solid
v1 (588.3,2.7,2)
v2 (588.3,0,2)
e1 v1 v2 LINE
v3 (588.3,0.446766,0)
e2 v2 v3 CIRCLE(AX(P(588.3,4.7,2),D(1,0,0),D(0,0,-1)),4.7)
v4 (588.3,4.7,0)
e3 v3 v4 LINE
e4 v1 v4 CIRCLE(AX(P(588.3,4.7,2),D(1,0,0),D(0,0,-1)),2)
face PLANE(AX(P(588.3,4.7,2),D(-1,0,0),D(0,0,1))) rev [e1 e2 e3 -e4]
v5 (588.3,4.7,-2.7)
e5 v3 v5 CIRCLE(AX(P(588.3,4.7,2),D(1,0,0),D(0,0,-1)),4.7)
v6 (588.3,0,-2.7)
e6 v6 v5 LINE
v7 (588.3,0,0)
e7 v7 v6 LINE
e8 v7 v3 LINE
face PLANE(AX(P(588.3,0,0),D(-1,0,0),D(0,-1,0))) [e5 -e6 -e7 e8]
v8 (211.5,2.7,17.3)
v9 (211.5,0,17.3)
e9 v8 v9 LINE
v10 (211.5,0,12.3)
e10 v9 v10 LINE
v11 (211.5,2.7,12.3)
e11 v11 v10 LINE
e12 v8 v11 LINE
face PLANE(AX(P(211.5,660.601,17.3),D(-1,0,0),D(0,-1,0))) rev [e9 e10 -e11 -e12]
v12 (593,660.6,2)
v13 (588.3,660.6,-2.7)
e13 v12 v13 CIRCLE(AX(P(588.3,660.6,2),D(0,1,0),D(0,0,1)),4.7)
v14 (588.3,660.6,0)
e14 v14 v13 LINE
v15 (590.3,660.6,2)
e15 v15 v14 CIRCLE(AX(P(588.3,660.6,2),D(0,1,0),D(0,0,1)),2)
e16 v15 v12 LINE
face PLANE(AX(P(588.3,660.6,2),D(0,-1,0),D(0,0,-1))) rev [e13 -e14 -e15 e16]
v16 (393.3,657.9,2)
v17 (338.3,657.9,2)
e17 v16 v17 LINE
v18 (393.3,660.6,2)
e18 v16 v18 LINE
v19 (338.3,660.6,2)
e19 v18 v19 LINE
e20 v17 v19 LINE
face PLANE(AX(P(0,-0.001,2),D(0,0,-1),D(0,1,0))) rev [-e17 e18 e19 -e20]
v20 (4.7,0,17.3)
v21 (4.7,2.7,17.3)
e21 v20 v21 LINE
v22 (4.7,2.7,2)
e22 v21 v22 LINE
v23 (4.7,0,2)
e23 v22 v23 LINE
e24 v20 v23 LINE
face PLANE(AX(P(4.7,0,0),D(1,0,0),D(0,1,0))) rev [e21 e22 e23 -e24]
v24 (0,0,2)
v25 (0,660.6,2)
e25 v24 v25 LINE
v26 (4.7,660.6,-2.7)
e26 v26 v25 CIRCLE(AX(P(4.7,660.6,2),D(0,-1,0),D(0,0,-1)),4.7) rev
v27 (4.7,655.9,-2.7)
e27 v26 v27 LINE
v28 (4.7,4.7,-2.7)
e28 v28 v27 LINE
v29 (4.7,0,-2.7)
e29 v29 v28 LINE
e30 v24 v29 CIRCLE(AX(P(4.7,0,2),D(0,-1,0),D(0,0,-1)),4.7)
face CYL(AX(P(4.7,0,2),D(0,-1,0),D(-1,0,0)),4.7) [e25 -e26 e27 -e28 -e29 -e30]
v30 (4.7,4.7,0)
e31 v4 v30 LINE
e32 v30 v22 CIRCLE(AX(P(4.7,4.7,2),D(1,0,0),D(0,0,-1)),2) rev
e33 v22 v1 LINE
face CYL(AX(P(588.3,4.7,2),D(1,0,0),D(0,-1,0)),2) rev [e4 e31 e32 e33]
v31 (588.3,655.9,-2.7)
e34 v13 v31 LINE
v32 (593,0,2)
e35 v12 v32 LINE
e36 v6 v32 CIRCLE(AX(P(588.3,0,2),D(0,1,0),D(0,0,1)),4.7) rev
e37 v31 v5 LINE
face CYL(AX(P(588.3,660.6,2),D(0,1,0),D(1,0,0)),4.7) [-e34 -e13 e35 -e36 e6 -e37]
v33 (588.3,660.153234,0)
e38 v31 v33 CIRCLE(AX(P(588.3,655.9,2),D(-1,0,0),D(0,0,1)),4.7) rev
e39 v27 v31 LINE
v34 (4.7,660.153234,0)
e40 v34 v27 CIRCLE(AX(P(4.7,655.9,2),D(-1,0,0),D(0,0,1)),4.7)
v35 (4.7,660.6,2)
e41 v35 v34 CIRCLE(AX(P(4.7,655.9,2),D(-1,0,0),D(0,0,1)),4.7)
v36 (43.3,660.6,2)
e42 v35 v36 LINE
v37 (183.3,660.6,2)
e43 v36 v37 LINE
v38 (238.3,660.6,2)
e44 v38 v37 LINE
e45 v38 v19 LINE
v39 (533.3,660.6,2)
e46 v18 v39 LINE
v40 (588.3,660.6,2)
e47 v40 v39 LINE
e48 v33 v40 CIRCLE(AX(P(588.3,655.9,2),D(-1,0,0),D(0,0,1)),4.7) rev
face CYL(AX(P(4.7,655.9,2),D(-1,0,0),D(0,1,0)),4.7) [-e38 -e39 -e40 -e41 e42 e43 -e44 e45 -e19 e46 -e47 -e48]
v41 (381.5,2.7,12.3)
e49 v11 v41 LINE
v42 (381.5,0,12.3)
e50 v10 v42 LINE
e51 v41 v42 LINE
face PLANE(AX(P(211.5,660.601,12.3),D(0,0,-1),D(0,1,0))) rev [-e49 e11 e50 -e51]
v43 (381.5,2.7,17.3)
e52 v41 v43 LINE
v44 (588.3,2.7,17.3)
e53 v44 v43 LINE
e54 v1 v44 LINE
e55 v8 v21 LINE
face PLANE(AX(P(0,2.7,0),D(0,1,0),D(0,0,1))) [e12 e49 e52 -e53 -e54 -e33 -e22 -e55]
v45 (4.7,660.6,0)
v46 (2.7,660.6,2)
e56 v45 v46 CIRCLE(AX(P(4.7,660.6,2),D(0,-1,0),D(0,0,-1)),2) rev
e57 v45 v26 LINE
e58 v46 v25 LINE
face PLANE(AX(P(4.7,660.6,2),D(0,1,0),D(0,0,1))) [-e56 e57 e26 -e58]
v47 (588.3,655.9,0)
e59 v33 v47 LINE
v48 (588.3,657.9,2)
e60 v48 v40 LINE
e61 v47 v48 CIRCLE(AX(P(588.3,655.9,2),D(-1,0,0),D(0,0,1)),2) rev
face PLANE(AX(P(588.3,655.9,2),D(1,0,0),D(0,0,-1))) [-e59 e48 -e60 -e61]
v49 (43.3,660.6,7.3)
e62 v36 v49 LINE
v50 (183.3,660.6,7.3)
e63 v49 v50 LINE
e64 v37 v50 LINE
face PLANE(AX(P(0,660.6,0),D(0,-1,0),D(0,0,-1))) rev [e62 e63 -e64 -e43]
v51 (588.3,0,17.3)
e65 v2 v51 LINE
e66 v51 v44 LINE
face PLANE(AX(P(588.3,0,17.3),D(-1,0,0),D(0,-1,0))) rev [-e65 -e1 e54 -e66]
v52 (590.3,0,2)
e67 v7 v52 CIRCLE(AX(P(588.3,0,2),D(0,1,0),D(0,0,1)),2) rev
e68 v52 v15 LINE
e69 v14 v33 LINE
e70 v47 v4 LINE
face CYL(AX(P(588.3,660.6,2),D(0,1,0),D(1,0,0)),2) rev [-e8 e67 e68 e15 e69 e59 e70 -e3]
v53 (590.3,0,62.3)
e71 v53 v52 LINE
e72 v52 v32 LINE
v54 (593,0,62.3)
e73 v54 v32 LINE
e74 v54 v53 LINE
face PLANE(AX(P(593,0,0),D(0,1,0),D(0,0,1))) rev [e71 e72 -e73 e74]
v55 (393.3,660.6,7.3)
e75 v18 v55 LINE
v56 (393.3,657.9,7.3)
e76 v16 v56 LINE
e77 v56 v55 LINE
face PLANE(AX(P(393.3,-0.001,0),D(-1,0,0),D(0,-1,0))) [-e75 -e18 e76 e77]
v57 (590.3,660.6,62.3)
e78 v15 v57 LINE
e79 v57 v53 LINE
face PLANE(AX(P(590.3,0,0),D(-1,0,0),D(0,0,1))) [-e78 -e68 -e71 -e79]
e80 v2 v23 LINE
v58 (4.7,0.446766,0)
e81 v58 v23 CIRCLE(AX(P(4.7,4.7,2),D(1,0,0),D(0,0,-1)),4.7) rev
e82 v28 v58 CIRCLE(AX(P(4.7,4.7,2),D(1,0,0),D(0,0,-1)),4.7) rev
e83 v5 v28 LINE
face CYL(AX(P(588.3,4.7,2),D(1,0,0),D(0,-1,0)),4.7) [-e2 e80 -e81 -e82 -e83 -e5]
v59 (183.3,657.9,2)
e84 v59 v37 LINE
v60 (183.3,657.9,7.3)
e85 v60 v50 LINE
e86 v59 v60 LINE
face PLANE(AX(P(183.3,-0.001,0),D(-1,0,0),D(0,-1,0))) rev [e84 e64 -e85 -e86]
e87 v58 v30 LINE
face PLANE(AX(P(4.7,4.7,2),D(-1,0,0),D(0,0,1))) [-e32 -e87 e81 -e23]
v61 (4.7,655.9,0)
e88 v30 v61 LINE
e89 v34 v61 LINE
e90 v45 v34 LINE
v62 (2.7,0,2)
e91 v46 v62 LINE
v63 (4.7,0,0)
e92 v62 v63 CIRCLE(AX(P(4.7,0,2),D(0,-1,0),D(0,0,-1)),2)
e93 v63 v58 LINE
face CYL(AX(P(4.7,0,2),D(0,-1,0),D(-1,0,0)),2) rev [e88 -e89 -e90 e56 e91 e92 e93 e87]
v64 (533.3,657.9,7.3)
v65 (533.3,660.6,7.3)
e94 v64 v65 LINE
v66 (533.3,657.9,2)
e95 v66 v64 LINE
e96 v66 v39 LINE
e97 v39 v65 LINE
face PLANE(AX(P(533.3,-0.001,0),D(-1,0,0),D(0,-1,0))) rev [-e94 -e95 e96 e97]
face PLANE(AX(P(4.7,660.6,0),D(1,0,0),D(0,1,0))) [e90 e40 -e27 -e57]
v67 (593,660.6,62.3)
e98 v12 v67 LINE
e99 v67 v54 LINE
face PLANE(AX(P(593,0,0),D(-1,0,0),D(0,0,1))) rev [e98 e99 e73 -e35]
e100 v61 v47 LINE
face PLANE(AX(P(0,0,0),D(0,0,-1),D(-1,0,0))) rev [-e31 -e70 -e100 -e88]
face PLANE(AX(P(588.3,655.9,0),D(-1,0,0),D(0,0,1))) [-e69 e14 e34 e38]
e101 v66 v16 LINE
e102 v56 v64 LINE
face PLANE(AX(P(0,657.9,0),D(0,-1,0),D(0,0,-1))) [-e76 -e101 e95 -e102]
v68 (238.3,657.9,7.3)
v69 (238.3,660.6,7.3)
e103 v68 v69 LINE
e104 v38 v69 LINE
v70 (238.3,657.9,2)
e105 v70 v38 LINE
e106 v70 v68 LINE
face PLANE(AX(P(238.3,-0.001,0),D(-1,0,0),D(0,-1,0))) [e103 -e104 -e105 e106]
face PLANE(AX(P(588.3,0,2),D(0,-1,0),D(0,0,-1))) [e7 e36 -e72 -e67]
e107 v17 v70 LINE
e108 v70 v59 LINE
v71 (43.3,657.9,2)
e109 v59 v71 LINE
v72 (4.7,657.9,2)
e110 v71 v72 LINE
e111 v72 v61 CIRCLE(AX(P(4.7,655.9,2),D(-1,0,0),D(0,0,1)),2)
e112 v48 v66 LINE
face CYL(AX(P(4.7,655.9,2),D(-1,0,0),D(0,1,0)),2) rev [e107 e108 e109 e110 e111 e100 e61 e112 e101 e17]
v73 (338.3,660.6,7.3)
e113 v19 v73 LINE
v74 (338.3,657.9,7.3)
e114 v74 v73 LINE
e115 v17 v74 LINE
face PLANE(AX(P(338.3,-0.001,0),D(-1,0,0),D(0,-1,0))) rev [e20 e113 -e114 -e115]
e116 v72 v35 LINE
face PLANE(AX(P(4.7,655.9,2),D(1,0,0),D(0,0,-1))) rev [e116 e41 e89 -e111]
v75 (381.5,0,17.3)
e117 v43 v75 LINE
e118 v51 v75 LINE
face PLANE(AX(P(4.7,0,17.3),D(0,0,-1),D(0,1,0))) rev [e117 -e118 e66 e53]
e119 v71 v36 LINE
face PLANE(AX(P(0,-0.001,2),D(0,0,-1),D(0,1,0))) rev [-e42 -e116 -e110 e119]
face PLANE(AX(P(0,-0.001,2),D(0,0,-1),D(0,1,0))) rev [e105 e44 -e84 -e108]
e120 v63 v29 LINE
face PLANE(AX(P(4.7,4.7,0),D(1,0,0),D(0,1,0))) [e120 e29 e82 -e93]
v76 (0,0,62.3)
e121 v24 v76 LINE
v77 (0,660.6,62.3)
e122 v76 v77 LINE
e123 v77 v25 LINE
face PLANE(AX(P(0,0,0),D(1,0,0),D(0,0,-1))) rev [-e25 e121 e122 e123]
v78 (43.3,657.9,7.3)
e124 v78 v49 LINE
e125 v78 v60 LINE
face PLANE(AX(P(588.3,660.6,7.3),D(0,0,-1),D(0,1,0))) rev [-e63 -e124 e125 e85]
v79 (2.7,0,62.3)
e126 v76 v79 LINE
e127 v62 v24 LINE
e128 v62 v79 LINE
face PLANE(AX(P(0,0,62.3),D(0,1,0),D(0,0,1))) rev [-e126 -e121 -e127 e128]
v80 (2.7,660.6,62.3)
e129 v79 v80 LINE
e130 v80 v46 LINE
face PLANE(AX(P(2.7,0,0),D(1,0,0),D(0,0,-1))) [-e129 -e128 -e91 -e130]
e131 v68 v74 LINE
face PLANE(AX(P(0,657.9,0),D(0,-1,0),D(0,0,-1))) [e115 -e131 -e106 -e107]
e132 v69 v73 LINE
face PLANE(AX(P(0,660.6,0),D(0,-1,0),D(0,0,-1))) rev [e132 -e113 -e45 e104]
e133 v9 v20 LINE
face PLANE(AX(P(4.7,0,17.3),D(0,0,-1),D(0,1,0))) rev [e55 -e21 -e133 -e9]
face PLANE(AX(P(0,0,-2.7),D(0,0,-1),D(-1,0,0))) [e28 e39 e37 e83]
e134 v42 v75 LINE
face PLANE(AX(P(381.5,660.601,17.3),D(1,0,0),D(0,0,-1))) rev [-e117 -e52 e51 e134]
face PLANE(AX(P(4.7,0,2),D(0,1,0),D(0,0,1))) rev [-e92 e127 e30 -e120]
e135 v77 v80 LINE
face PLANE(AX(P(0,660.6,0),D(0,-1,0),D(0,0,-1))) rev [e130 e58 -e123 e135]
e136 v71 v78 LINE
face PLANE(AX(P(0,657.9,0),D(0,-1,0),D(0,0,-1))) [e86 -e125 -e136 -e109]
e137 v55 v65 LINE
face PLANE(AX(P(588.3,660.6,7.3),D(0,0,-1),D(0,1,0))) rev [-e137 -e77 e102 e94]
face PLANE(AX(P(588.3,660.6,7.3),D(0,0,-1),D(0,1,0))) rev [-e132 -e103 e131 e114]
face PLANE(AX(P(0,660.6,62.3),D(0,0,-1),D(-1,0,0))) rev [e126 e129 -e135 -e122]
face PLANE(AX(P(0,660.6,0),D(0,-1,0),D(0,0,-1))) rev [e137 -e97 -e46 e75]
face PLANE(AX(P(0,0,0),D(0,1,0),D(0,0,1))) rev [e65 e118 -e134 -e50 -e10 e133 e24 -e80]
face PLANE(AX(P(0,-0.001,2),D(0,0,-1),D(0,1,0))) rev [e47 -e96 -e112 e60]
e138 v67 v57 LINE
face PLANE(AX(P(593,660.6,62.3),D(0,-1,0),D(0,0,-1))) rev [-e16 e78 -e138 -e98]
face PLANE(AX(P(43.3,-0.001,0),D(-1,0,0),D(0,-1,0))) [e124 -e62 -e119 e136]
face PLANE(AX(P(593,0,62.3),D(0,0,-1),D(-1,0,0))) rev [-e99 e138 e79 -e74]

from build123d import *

# Parameters (mm, degrees)
SKETCH1_W                      = 593
SKETCH1_H                      = 660.6
BASE_FLANGE1_DEPTH             = 2.7
EDGE_FLANGE1_STRIP_W           = 14.8
EDGE_FLANGE1_STRIP_H           = 2.7
EDGE_FLANGE1_STRIP_CUT_DEPTH   = 660.6
EDGE_FLANGE1_STRIP_2_W         = 14.8
EDGE_FLANGE1_STRIP_2_H         = 2.7
EDGE_FLANGE1_STRIP_CUT_2_DEPTH = 660.6
EDGE_FLANGE1_DEPTH             = 660.6
EDGE_FLANGE1_BEND_DEPTH        = 660.6
EDGE_FLANGE2_STRIP_W           = 14.8
EDGE_FLANGE2_STRIP_H           = 2.7
EDGE_FLANGE2_STRIP_CUT_DEPTH   = 583.6
EDGE_FLANGE2_DEPTH             = 583.6
CUT_EXTRUDE2_REACH             = 891.9
SKETCH15_W                     = 38.6
SKETCH15_H                     = 5.3
SKETCH15_W_2                   = 55
EDGE_FLANGE3_STRIP_W           = 14.8
EDGE_FLANGE3_STRIP_H           = 2.7
EDGE_FLANGE3_STRIP_CUT_DEPTH   = 583.6
EDGE_FLANGE3_DEPTH             = 583.6
CUT_EXTRUDE3_REACH             = 891.9
SKETCH23_W                     = 170
SKETCH23_H                     = 5


# Sheet-metal steps are written as plain solids
with BuildPart() as part:
    # Sketch1 → Base-Flange1 (new body)
    with BuildSketch(Plane.XY):
        with Locations((296.5, 330.3)):
            Rectangle(SKETCH1_W, SKETCH1_H)
    extrude(amount=-BASE_FLANGE1_DEPTH)

    # Edge-Flange1 strip (across the edge) → Edge-Flange1 strip cut (cut)
    with BuildSketch(Plane.XZ.offset(-660.6)):
        with Locations((-2.7, -1.35)):
            Rectangle(EDGE_FLANGE1_STRIP_W, EDGE_FLANGE1_STRIP_H)
    extrude(amount=EDGE_FLANGE1_STRIP_CUT_DEPTH, mode=Mode.SUBTRACT)

    # Edge-Flange1 strip 2 (across the edge) → Edge-Flange1 strip cut 2 (cut)
    with BuildSketch(Plane(origin=(593, 0, 0), x_dir=(-1, 0, 0), z_dir=(0, 1, 0))):
        with Locations((-2.7, -1.35)):
            Rectangle(EDGE_FLANGE1_STRIP_2_W, EDGE_FLANGE1_STRIP_2_H)
    extrude(amount=EDGE_FLANGE1_STRIP_CUT_2_DEPTH, mode=Mode.SUBTRACT)

    # Edge-Flange1 section (across the edge) → Edge-Flange1 (add)
    with BuildSketch(Plane.XZ.offset(-660.6)):
        with BuildLine():
            Line((0, 2), (0, 62.3))
            Line((0, 62.3), (2.7, 62.3))
            Line((2.7, 62.3), (2.7, 2))
            ThreePointArc((2.7, 2), (3.285786438, 0.585786438), (4.7, 0))
            Line((4.7, 0), (4.7, -2.7))
            ThreePointArc((4.7, -2.7), (1.376598128, -1.323401872), (0, 2))
        make_face()
    extrude(amount=EDGE_FLANGE1_DEPTH)

    # Edge-Flange1 section 2 (across the edge) → Edge-Flange1 bend (add)
    with BuildSketch(Plane(origin=(593, 0, 0), x_dir=(-1, 0, 0), z_dir=(0, 1, 0))):
        with BuildLine():
            Line((0, 2), (0, 62.3))
            Line((0, 62.3), (2.7, 62.3))
            Line((2.7, 62.3), (2.7, 2))
            ThreePointArc((2.7, 2), (3.285786438, 0.585786438), (4.7, 0))
            Line((4.7, 0), (4.7, -2.7))
            ThreePointArc((4.7, -2.7), (1.376598128, -1.323401872), (0, 2))
        make_face()
    extrude(amount=EDGE_FLANGE1_BEND_DEPTH)

    # Edge-Flange2 strip (across the edge) → Edge-Flange2 strip cut (cut)
    with BuildSketch(Plane(origin=(588.3, 660.6, 0), x_dir=(0, -1, 0), z_dir=(-1, 0, 0))):
        with Locations((-2.7, -1.35)):
            Rectangle(EDGE_FLANGE2_STRIP_W, EDGE_FLANGE2_STRIP_H)
    extrude(amount=EDGE_FLANGE2_STRIP_CUT_DEPTH, mode=Mode.SUBTRACT)

    # Edge-Flange2 section (across the edge) → Edge-Flange2 (add)
    with BuildSketch(Plane(origin=(588.3, 660.6, 0), x_dir=(0, -1, 0), z_dir=(-1, 0, 0))):
        with BuildLine():
            Line((0, 2), (0, 7.3))
            Line((0, 7.3), (2.7, 7.3))
            Line((2.7, 7.3), (2.7, 2))
            ThreePointArc((2.7, 2), (3.285786438, 0.585786438), (4.7, 0))
            Line((4.7, 0), (4.7, -2.7))
            ThreePointArc((4.7, -2.7), (1.376598128, -1.323401872), (0, 2))
        make_face()
    extrude(amount=EDGE_FLANGE2_DEPTH)

    # Sketch15 → Cut-Extrude2 (cut, up to next)
    with BuildSketch(Plane(origin=(0, 660.6, 0), x_dir=(1, 0, 0), z_dir=(0, 1, 0)), mode=Mode.PRIVATE) as cut_extrude2_sk1:
        with Locations((24, -4.65)):
            Rectangle(SKETCH15_W, SKETCH15_H)
    cut_extrude2_tool1 = extrude(cut_extrude2_sk1.sketch, amount=-CUT_EXTRUDE2_REACH, mode=Mode.PRIVATE) & part.part
    # Sketch15 → Cut-Extrude2 (cut, up to next)
    with BuildSketch(Plane(origin=(0, 660.6, 0), x_dir=(1, 0, 0), z_dir=(0, 1, 0)), mode=Mode.PRIVATE) as cut_extrude2_sk2:
        with Locations((210.8, -4.65)):
            Rectangle(SKETCH15_W_2, SKETCH15_H)
    cut_extrude2_tool2 = extrude(cut_extrude2_sk2.sketch, amount=-CUT_EXTRUDE2_REACH, mode=Mode.PRIVATE) & part.part
    # Sketch15 → Cut-Extrude2 (cut, up to next)
    with BuildSketch(Plane(origin=(0, 660.6, 0), x_dir=(1, 0, 0), z_dir=(0, 1, 0)), mode=Mode.PRIVATE) as cut_extrude2_sk3:
        with Locations((365.8, -4.65)):
            Rectangle(SKETCH15_W_2, SKETCH15_H)
    cut_extrude2_tool3 = extrude(cut_extrude2_sk3.sketch, amount=-CUT_EXTRUDE2_REACH, mode=Mode.PRIVATE) & part.part
    # Sketch15 → Cut-Extrude2 (cut, up to next)
    with BuildSketch(Plane(origin=(0, 660.6, 0), x_dir=(1, 0, 0), z_dir=(0, 1, 0)), mode=Mode.PRIVATE) as cut_extrude2_sk4:
        with Locations((560.8, -4.65)):
            Rectangle(SKETCH15_W_2, SKETCH15_H)
    cut_extrude2_tool4 = extrude(cut_extrude2_sk4.sketch, amount=-CUT_EXTRUDE2_REACH, mode=Mode.PRIVATE) & part.part
    add(cut_extrude2_tool1.solids().sort_by_distance((24, 660.6, 4.65))[0], mode=Mode.SUBTRACT)
    add(cut_extrude2_tool2.solids().sort_by_distance((210.8, 660.6, 4.65))[0], mode=Mode.SUBTRACT)
    add(cut_extrude2_tool3.solids().sort_by_distance((365.8, 660.6, 4.65))[0], mode=Mode.SUBTRACT)
    add(cut_extrude2_tool4.solids().sort_by_distance((560.8, 660.6, 4.65))[0], mode=Mode.SUBTRACT)

    # Edge-Flange3 strip (across the edge) → Edge-Flange3 strip cut (cut)
    with BuildSketch(Plane.YZ.offset(4.7)):
        with Locations((-2.7, -1.35)):
            Rectangle(EDGE_FLANGE3_STRIP_W, EDGE_FLANGE3_STRIP_H)
    extrude(amount=EDGE_FLANGE3_STRIP_CUT_DEPTH, mode=Mode.SUBTRACT)

    # Edge-Flange3 section (across the edge) → Edge-Flange3 (add)
    with BuildSketch(Plane.YZ.offset(4.7)):
        with BuildLine():
            Line((0, 2), (0, 17.3))
            Line((0, 17.3), (2.7, 17.3))
            Line((2.7, 17.3), (2.7, 2))
            ThreePointArc((2.7, 2), (3.285786438, 0.585786438), (4.7, 0))
            Line((4.7, 0), (4.7, -2.7))
            ThreePointArc((4.7, -2.7), (1.376598128, -1.323401872), (0, 2))
        make_face()
    extrude(amount=EDGE_FLANGE3_DEPTH)

    # Sketch23 → Cut-Extrude3 (cut, up to next)
    with BuildSketch(Plane.XZ, mode=Mode.PRIVATE) as cut_extrude3_sk1:
        with Locations((296.5, 14.8)):
            Rectangle(SKETCH23_W, SKETCH23_H)
    cut_extrude3_tool1 = extrude(cut_extrude3_sk1.sketch, amount=-CUT_EXTRUDE3_REACH, mode=Mode.PRIVATE) & part.part
    add(cut_extrude3_tool1.solids().sort_by_distance((296.5, 0, 14.8))[0], mode=Mode.SUBTRACT)


solid = part.part
